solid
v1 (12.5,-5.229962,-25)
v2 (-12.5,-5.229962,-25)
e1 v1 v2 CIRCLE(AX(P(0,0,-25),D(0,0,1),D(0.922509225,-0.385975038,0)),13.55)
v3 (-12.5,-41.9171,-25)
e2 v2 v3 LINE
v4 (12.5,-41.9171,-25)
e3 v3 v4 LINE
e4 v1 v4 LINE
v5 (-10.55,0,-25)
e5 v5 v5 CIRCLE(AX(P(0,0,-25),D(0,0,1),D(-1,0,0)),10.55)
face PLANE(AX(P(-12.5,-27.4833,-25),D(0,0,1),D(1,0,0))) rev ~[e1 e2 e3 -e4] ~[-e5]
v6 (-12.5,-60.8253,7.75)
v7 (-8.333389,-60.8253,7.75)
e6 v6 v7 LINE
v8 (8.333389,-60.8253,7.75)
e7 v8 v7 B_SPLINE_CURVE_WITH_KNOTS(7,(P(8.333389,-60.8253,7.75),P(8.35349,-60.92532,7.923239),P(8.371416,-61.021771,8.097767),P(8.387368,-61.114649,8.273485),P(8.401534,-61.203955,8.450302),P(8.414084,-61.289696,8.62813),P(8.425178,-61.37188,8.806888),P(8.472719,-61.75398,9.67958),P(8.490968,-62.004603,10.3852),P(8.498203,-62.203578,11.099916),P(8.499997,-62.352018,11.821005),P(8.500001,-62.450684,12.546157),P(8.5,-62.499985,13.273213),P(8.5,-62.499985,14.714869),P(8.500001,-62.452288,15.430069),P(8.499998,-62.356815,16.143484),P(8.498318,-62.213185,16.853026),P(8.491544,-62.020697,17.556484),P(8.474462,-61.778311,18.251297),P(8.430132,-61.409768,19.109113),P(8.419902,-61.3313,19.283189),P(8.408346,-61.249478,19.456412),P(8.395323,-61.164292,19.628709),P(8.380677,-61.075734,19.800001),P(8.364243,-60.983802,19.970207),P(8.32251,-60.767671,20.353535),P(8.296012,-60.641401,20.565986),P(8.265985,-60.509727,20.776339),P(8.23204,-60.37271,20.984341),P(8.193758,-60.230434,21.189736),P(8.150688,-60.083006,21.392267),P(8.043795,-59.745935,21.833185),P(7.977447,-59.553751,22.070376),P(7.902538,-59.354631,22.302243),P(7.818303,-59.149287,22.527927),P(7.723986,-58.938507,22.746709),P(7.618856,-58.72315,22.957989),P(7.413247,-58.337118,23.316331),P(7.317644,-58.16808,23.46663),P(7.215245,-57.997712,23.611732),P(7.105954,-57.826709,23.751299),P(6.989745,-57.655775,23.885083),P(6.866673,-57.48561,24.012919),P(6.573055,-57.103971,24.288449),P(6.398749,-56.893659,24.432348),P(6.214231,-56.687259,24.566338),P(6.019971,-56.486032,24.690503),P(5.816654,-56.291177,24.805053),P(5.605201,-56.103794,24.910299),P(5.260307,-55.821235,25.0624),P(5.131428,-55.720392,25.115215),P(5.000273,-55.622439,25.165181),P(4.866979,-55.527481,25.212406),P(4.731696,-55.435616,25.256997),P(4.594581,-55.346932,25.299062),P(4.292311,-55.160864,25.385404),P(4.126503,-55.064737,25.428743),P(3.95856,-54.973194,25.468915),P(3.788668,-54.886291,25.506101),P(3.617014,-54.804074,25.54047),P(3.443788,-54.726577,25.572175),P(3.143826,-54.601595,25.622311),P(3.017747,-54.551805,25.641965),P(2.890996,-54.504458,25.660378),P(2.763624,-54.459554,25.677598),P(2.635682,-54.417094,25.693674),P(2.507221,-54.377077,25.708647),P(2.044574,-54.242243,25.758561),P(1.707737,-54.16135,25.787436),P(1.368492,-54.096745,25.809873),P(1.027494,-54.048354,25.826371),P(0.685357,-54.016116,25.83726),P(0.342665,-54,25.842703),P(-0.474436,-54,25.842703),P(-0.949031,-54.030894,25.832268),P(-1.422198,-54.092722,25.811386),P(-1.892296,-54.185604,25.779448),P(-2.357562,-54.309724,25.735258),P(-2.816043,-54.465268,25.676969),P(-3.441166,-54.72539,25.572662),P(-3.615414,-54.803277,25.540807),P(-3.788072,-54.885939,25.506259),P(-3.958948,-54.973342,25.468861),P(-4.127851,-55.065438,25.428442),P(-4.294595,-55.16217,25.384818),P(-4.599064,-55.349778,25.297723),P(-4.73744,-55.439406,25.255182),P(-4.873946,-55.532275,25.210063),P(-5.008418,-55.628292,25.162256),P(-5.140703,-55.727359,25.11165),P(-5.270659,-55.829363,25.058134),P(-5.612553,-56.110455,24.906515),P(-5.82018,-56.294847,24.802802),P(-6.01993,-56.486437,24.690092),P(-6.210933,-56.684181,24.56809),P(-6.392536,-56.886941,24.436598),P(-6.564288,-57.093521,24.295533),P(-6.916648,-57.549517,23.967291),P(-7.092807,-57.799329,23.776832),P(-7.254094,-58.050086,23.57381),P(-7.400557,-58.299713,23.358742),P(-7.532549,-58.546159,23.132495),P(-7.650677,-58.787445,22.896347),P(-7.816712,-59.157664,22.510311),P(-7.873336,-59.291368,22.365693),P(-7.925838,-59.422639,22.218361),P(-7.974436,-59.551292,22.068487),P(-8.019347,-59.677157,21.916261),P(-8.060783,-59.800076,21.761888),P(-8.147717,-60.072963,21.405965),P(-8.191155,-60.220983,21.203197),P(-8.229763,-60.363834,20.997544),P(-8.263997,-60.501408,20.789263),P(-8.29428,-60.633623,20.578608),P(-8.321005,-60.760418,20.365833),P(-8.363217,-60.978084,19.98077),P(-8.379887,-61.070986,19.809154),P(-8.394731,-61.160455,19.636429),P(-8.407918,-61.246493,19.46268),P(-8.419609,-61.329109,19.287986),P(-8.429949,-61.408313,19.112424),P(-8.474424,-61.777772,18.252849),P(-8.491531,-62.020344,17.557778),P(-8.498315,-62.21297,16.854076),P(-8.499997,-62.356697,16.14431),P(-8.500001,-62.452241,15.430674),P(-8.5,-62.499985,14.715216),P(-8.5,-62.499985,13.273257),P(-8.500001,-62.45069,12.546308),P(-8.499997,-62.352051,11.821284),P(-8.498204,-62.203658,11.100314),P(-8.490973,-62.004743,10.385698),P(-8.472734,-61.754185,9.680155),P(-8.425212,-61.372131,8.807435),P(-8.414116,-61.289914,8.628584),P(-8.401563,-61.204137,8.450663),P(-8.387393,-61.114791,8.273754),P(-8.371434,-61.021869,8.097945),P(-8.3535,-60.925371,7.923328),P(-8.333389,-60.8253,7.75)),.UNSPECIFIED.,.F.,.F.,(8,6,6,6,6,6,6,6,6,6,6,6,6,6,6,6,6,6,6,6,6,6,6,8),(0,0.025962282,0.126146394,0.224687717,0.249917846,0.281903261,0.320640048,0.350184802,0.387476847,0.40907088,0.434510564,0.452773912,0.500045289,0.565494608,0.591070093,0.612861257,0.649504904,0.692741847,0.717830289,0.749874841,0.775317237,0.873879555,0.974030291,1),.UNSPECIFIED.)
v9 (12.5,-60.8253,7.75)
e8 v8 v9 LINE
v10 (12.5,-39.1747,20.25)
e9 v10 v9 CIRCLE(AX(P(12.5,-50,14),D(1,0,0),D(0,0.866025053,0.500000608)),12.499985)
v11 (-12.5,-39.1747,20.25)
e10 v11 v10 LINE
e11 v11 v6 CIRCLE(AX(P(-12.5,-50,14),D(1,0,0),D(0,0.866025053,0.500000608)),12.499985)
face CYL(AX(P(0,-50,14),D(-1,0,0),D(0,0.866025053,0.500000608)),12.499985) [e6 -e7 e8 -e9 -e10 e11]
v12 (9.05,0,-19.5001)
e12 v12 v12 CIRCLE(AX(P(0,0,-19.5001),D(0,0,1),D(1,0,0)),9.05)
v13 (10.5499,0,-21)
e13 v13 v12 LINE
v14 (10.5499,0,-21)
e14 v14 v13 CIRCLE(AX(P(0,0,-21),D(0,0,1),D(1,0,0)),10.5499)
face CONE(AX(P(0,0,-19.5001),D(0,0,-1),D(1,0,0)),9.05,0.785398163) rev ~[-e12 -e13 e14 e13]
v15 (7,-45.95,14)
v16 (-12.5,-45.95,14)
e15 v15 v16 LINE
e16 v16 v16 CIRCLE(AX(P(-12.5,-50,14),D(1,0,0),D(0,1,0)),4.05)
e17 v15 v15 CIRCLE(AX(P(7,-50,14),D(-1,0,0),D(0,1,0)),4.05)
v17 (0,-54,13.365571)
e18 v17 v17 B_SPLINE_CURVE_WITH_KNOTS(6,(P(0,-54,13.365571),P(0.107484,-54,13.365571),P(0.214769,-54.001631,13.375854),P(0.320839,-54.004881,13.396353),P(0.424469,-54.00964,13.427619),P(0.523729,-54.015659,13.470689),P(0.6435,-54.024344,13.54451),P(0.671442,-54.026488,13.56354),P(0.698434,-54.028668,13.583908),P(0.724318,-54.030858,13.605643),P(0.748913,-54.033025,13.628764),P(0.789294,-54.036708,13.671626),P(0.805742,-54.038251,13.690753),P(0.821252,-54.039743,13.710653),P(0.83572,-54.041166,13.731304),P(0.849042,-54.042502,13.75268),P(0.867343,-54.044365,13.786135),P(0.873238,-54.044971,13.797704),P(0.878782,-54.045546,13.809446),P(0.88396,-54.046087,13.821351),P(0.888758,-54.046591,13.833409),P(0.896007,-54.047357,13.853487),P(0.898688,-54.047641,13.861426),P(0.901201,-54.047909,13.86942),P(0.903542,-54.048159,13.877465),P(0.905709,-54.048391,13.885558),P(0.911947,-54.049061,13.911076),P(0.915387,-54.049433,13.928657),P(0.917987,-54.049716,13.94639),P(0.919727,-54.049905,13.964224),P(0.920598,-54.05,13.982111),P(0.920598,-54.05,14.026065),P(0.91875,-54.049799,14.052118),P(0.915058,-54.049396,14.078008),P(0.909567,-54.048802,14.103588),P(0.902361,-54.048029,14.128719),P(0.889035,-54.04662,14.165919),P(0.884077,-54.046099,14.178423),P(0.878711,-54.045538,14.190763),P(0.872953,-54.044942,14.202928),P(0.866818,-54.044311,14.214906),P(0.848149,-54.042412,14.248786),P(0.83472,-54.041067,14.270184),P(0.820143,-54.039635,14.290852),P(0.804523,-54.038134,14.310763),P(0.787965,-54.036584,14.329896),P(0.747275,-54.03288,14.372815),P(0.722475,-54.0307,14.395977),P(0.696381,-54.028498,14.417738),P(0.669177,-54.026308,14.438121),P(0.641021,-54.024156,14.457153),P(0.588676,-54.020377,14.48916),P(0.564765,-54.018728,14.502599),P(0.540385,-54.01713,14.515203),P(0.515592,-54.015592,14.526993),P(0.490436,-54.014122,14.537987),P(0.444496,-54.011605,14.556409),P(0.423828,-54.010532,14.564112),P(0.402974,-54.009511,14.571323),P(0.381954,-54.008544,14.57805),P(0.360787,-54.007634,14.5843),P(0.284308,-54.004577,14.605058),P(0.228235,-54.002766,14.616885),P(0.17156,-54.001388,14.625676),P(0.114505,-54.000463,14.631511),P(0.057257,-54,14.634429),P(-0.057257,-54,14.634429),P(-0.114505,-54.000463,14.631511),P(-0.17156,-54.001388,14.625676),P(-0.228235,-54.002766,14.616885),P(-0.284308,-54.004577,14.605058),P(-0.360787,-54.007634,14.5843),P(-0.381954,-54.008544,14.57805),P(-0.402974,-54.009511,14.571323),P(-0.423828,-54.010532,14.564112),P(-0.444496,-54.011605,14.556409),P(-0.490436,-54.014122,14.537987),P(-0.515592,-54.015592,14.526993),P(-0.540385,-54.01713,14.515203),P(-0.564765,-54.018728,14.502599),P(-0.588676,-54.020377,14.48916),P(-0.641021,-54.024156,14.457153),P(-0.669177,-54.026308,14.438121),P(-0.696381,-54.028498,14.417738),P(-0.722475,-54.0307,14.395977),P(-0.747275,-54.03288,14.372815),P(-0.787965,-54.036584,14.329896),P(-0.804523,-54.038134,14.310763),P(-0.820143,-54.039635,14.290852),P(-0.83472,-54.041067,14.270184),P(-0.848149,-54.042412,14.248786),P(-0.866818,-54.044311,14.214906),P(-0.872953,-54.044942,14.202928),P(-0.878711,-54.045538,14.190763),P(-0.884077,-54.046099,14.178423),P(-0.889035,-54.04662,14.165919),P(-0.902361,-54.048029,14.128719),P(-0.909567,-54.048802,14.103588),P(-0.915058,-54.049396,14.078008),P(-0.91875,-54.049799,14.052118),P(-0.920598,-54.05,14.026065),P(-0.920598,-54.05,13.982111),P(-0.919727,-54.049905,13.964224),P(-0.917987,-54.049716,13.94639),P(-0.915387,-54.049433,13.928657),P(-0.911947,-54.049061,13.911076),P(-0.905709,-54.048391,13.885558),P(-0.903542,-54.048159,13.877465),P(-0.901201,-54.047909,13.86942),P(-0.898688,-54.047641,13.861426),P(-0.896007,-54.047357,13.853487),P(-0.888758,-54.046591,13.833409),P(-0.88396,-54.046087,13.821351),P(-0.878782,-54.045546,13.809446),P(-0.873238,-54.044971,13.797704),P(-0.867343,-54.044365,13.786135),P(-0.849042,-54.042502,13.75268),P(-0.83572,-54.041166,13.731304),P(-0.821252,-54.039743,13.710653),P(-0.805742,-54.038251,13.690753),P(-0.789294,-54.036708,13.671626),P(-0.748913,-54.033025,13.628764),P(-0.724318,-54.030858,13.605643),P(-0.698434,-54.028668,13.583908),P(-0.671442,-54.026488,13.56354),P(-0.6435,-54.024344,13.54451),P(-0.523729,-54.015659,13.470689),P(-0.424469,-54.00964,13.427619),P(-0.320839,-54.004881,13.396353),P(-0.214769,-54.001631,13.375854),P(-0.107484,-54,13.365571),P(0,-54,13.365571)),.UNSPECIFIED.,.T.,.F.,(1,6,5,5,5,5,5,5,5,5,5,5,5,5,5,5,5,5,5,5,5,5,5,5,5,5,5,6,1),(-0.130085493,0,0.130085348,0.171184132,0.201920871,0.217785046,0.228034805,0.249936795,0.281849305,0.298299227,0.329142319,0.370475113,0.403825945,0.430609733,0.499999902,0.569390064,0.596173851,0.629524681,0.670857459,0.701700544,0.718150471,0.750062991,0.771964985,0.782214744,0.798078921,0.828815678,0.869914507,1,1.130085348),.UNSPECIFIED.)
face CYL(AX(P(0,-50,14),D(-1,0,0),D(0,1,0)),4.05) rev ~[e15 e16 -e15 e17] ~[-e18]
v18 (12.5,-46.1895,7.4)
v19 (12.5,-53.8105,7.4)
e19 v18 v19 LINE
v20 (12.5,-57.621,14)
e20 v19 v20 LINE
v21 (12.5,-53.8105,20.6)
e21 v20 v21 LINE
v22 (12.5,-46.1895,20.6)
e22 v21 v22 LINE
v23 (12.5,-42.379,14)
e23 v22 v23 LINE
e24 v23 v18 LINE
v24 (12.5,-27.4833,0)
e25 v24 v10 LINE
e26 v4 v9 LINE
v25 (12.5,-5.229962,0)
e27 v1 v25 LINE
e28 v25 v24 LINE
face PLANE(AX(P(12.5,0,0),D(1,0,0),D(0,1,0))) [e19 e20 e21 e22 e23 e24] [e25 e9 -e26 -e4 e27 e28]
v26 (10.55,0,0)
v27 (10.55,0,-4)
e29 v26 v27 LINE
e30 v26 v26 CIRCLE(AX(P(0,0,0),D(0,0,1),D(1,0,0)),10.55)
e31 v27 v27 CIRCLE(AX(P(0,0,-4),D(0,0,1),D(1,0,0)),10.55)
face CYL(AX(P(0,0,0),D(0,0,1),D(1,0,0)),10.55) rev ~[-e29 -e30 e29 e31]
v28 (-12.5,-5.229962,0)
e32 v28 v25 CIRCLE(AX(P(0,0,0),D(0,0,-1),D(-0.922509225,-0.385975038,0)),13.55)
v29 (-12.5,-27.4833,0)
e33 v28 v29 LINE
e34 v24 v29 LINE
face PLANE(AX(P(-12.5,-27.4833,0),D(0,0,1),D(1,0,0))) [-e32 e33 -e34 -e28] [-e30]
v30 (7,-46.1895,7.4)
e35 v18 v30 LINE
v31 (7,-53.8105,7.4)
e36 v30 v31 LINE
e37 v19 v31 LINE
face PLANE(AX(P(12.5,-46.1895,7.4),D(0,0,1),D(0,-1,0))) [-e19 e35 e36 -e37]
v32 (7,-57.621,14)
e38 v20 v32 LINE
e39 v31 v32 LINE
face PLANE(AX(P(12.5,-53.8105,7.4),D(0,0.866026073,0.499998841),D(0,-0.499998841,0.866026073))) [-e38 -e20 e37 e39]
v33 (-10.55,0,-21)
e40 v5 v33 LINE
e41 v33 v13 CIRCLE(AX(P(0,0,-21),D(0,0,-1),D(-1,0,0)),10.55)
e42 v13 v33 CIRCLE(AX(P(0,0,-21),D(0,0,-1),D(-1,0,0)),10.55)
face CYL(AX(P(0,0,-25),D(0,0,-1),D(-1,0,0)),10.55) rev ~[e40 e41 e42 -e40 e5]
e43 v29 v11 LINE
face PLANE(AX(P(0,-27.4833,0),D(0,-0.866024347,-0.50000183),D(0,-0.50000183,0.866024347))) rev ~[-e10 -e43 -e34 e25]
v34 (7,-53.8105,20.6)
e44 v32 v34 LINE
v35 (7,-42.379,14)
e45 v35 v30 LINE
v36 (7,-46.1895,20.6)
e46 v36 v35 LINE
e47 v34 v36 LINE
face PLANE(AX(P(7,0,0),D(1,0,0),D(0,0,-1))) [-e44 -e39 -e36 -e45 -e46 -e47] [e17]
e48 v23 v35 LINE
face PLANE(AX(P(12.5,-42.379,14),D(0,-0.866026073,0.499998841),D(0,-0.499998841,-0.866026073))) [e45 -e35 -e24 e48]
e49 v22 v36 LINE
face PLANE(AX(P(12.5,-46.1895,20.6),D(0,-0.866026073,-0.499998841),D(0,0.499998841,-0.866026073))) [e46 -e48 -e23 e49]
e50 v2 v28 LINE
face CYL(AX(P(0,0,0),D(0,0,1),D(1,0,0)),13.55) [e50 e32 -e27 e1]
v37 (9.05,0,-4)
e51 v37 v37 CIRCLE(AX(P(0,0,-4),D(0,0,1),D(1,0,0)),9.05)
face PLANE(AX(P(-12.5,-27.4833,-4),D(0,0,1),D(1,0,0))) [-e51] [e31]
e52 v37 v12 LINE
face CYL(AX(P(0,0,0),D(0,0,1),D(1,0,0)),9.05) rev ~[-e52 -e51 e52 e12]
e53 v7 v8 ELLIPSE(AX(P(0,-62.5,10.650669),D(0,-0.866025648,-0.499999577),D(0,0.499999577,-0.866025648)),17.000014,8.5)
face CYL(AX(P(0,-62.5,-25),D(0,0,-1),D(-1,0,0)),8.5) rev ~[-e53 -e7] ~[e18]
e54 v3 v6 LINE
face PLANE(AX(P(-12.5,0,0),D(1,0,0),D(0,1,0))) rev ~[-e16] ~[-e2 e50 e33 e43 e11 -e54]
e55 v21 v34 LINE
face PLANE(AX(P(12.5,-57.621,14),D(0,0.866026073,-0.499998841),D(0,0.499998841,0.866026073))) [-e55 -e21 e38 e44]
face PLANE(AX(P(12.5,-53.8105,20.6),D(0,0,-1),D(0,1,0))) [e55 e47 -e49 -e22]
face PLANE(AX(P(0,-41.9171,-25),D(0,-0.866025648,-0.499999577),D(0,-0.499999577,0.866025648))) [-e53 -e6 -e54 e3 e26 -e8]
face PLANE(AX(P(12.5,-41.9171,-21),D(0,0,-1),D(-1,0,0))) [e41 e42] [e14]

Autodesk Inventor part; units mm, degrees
ref_plane "YZ Plane" through (0, 0, 0) normal (1, 0, 0) x (0, 1, 0)
ref_plane "XZ Plane" through (0, 0, 0) normal (0, 1, 0) x (-1, 0, 0)
ref_plane "XY Plane" through (0, 0, 0) normal (0, 0, 1) x (1, 0, 0)
sketch "Sketch1" plane through (0, 0, 0) normal (1, 0, 0) x (0, 1, 0)
  circle A0 centre (-50, 14) radius 4.05
  arc A1 (-39.1747, 20.25) -> (-60.8253, 7.75) centre (-50, 14) ccw
  line L0 (0, 0) -> (0, -25)
  line L1 (0, -25) -> (-41.9171, -25)
  line L2 (-41.9171, -25) -> (-60.8253, 7.75)
  line L3 (0, 0) -> (-27.4833, 0)
  line L4 (-27.4833, 0) -> (-39.1747, 20.25)
  dimension "d0" = 8.1
  dimension "d2" = 50
  dimension "d3" = 14
  dimension "d4" = 25
  dimension "d6" = 25
  dimension "d40" = 120
extrude "Extrusion1" add sketch "Sketch1" along normal mid plane 25
sketch "Sketch2" plane through (-12.5, -27.4833, 0) normal (0, 0, 1) x (1, 0, 0)
  circle A0 centre (12.5, 27.4833) radius 12.5
extrude "Extrusion2" add sketch "Sketch2" against normal up to surface (25 mm away)
sketch "Sketch13" plane through (-12.5, -27.4833, 0) normal (0, 0, 1) x (1, 0, 0)
  arc A0 (25, 27.4833) -> (0, 27.4833) centre (12.5, 27.4833) ccw projected
  circle A1 centre (12.5, 27.4833) radius 9.05
  dimension "d59" = 18.1
extrude "Extrusion13" cut sketch "Sketch13" against normal through all
sketch "Sketch14" plane through (-12.5, -27.4833, 0) normal (0, 0, 1) x (1, 0, 0)
  circle A0 centre (12.5, 27.4833) radius 9.05 projected
  arc A1 (25, 27.4833) -> (0, 27.4833) centre (12.5, 27.4833) ccw projected
  circle A2 centre (12.5, 27.4833) radius 10.55
  dimension "d63" = 21.1
extrude "Extrusion14" cut sketch "Sketch14" against normal blind 4
sketch "Sketch15" plane through (12.5, -41.9171, -25) normal (0, 0, -1) x (-1, 0, 0)
  circle A0 centre (12.5, 41.9171) radius 9.05 projected
  arc A1 (25, 41.9171) -> (0, 41.9171) centre (12.5, 41.9171) ccw projected
  circle A2 centre (12.5, 41.9171) radius 10.55
  dimension "d67" = 21.1
extrude "Extrusion15" cut sketch "Sketch15" against normal blind 4
chamfer "Chamfer4" distance 1.5 angle 45 1 edges at (-9.05, 0, -21)
sketch "Sketch16" plane through (-12.5, -27.4833, 0) normal (0, 0, 1) x (1, 0, 0)
  circle A0 centre (12.5, 27.4833) radius 10.55 projected
  arc A1 (25, 27.4833) -> (0, 27.4833) centre (12.5, 27.4833) ccw projected
  circle A2 centre (12.5, 27.4833) radius 13.55
  dimension "d76" = 3
extrude "Extrusion16" add sketch "Sketch16" against normal up to surface (25 mm away)
sketch "Sketch17" plane through (12.5, 0, 0) normal (1, 0, 0) x (0, 0, -1)
  arc A0 (-19.5, -40.4737) -> (-8.5, -59.5263) centre (-14, -50) ccw projected
  line L0 (-14, -42.379) -> (-7.4, -46.1895)
  line L1 (-7.4, -46.1895) -> (-7.4, -53.8105)
  line L2 (-7.4, -53.8105) -> (-14, -57.621)
  line L3 (-14, -57.621) -> (-20.6, -53.8105)
  line L4 (-20.6, -53.8105) -> (-20.6, -46.1895)
  line L5 (-20.6, -46.1895) -> (-14, -42.379)
  point P0 (0, 0)
  dimension "d80" = 13.2
extrude "Extrusion17" cut sketch "Sketch17" against normal blind 5.5
sketch "Sketch18" plane through (12.5, -41.9171, -25) normal (0, 0, -1) x (-1, 0, 0)
  line L0 (25, -20.5829) -> (0, -20.5829) projected
  circle A0 centre (12.5, -20.5829) radius 8.5
  dimension "d83" = 17
extrude "Extrusion18" cut sketch "Sketch18" against normal through all
properties part number "hub top"
